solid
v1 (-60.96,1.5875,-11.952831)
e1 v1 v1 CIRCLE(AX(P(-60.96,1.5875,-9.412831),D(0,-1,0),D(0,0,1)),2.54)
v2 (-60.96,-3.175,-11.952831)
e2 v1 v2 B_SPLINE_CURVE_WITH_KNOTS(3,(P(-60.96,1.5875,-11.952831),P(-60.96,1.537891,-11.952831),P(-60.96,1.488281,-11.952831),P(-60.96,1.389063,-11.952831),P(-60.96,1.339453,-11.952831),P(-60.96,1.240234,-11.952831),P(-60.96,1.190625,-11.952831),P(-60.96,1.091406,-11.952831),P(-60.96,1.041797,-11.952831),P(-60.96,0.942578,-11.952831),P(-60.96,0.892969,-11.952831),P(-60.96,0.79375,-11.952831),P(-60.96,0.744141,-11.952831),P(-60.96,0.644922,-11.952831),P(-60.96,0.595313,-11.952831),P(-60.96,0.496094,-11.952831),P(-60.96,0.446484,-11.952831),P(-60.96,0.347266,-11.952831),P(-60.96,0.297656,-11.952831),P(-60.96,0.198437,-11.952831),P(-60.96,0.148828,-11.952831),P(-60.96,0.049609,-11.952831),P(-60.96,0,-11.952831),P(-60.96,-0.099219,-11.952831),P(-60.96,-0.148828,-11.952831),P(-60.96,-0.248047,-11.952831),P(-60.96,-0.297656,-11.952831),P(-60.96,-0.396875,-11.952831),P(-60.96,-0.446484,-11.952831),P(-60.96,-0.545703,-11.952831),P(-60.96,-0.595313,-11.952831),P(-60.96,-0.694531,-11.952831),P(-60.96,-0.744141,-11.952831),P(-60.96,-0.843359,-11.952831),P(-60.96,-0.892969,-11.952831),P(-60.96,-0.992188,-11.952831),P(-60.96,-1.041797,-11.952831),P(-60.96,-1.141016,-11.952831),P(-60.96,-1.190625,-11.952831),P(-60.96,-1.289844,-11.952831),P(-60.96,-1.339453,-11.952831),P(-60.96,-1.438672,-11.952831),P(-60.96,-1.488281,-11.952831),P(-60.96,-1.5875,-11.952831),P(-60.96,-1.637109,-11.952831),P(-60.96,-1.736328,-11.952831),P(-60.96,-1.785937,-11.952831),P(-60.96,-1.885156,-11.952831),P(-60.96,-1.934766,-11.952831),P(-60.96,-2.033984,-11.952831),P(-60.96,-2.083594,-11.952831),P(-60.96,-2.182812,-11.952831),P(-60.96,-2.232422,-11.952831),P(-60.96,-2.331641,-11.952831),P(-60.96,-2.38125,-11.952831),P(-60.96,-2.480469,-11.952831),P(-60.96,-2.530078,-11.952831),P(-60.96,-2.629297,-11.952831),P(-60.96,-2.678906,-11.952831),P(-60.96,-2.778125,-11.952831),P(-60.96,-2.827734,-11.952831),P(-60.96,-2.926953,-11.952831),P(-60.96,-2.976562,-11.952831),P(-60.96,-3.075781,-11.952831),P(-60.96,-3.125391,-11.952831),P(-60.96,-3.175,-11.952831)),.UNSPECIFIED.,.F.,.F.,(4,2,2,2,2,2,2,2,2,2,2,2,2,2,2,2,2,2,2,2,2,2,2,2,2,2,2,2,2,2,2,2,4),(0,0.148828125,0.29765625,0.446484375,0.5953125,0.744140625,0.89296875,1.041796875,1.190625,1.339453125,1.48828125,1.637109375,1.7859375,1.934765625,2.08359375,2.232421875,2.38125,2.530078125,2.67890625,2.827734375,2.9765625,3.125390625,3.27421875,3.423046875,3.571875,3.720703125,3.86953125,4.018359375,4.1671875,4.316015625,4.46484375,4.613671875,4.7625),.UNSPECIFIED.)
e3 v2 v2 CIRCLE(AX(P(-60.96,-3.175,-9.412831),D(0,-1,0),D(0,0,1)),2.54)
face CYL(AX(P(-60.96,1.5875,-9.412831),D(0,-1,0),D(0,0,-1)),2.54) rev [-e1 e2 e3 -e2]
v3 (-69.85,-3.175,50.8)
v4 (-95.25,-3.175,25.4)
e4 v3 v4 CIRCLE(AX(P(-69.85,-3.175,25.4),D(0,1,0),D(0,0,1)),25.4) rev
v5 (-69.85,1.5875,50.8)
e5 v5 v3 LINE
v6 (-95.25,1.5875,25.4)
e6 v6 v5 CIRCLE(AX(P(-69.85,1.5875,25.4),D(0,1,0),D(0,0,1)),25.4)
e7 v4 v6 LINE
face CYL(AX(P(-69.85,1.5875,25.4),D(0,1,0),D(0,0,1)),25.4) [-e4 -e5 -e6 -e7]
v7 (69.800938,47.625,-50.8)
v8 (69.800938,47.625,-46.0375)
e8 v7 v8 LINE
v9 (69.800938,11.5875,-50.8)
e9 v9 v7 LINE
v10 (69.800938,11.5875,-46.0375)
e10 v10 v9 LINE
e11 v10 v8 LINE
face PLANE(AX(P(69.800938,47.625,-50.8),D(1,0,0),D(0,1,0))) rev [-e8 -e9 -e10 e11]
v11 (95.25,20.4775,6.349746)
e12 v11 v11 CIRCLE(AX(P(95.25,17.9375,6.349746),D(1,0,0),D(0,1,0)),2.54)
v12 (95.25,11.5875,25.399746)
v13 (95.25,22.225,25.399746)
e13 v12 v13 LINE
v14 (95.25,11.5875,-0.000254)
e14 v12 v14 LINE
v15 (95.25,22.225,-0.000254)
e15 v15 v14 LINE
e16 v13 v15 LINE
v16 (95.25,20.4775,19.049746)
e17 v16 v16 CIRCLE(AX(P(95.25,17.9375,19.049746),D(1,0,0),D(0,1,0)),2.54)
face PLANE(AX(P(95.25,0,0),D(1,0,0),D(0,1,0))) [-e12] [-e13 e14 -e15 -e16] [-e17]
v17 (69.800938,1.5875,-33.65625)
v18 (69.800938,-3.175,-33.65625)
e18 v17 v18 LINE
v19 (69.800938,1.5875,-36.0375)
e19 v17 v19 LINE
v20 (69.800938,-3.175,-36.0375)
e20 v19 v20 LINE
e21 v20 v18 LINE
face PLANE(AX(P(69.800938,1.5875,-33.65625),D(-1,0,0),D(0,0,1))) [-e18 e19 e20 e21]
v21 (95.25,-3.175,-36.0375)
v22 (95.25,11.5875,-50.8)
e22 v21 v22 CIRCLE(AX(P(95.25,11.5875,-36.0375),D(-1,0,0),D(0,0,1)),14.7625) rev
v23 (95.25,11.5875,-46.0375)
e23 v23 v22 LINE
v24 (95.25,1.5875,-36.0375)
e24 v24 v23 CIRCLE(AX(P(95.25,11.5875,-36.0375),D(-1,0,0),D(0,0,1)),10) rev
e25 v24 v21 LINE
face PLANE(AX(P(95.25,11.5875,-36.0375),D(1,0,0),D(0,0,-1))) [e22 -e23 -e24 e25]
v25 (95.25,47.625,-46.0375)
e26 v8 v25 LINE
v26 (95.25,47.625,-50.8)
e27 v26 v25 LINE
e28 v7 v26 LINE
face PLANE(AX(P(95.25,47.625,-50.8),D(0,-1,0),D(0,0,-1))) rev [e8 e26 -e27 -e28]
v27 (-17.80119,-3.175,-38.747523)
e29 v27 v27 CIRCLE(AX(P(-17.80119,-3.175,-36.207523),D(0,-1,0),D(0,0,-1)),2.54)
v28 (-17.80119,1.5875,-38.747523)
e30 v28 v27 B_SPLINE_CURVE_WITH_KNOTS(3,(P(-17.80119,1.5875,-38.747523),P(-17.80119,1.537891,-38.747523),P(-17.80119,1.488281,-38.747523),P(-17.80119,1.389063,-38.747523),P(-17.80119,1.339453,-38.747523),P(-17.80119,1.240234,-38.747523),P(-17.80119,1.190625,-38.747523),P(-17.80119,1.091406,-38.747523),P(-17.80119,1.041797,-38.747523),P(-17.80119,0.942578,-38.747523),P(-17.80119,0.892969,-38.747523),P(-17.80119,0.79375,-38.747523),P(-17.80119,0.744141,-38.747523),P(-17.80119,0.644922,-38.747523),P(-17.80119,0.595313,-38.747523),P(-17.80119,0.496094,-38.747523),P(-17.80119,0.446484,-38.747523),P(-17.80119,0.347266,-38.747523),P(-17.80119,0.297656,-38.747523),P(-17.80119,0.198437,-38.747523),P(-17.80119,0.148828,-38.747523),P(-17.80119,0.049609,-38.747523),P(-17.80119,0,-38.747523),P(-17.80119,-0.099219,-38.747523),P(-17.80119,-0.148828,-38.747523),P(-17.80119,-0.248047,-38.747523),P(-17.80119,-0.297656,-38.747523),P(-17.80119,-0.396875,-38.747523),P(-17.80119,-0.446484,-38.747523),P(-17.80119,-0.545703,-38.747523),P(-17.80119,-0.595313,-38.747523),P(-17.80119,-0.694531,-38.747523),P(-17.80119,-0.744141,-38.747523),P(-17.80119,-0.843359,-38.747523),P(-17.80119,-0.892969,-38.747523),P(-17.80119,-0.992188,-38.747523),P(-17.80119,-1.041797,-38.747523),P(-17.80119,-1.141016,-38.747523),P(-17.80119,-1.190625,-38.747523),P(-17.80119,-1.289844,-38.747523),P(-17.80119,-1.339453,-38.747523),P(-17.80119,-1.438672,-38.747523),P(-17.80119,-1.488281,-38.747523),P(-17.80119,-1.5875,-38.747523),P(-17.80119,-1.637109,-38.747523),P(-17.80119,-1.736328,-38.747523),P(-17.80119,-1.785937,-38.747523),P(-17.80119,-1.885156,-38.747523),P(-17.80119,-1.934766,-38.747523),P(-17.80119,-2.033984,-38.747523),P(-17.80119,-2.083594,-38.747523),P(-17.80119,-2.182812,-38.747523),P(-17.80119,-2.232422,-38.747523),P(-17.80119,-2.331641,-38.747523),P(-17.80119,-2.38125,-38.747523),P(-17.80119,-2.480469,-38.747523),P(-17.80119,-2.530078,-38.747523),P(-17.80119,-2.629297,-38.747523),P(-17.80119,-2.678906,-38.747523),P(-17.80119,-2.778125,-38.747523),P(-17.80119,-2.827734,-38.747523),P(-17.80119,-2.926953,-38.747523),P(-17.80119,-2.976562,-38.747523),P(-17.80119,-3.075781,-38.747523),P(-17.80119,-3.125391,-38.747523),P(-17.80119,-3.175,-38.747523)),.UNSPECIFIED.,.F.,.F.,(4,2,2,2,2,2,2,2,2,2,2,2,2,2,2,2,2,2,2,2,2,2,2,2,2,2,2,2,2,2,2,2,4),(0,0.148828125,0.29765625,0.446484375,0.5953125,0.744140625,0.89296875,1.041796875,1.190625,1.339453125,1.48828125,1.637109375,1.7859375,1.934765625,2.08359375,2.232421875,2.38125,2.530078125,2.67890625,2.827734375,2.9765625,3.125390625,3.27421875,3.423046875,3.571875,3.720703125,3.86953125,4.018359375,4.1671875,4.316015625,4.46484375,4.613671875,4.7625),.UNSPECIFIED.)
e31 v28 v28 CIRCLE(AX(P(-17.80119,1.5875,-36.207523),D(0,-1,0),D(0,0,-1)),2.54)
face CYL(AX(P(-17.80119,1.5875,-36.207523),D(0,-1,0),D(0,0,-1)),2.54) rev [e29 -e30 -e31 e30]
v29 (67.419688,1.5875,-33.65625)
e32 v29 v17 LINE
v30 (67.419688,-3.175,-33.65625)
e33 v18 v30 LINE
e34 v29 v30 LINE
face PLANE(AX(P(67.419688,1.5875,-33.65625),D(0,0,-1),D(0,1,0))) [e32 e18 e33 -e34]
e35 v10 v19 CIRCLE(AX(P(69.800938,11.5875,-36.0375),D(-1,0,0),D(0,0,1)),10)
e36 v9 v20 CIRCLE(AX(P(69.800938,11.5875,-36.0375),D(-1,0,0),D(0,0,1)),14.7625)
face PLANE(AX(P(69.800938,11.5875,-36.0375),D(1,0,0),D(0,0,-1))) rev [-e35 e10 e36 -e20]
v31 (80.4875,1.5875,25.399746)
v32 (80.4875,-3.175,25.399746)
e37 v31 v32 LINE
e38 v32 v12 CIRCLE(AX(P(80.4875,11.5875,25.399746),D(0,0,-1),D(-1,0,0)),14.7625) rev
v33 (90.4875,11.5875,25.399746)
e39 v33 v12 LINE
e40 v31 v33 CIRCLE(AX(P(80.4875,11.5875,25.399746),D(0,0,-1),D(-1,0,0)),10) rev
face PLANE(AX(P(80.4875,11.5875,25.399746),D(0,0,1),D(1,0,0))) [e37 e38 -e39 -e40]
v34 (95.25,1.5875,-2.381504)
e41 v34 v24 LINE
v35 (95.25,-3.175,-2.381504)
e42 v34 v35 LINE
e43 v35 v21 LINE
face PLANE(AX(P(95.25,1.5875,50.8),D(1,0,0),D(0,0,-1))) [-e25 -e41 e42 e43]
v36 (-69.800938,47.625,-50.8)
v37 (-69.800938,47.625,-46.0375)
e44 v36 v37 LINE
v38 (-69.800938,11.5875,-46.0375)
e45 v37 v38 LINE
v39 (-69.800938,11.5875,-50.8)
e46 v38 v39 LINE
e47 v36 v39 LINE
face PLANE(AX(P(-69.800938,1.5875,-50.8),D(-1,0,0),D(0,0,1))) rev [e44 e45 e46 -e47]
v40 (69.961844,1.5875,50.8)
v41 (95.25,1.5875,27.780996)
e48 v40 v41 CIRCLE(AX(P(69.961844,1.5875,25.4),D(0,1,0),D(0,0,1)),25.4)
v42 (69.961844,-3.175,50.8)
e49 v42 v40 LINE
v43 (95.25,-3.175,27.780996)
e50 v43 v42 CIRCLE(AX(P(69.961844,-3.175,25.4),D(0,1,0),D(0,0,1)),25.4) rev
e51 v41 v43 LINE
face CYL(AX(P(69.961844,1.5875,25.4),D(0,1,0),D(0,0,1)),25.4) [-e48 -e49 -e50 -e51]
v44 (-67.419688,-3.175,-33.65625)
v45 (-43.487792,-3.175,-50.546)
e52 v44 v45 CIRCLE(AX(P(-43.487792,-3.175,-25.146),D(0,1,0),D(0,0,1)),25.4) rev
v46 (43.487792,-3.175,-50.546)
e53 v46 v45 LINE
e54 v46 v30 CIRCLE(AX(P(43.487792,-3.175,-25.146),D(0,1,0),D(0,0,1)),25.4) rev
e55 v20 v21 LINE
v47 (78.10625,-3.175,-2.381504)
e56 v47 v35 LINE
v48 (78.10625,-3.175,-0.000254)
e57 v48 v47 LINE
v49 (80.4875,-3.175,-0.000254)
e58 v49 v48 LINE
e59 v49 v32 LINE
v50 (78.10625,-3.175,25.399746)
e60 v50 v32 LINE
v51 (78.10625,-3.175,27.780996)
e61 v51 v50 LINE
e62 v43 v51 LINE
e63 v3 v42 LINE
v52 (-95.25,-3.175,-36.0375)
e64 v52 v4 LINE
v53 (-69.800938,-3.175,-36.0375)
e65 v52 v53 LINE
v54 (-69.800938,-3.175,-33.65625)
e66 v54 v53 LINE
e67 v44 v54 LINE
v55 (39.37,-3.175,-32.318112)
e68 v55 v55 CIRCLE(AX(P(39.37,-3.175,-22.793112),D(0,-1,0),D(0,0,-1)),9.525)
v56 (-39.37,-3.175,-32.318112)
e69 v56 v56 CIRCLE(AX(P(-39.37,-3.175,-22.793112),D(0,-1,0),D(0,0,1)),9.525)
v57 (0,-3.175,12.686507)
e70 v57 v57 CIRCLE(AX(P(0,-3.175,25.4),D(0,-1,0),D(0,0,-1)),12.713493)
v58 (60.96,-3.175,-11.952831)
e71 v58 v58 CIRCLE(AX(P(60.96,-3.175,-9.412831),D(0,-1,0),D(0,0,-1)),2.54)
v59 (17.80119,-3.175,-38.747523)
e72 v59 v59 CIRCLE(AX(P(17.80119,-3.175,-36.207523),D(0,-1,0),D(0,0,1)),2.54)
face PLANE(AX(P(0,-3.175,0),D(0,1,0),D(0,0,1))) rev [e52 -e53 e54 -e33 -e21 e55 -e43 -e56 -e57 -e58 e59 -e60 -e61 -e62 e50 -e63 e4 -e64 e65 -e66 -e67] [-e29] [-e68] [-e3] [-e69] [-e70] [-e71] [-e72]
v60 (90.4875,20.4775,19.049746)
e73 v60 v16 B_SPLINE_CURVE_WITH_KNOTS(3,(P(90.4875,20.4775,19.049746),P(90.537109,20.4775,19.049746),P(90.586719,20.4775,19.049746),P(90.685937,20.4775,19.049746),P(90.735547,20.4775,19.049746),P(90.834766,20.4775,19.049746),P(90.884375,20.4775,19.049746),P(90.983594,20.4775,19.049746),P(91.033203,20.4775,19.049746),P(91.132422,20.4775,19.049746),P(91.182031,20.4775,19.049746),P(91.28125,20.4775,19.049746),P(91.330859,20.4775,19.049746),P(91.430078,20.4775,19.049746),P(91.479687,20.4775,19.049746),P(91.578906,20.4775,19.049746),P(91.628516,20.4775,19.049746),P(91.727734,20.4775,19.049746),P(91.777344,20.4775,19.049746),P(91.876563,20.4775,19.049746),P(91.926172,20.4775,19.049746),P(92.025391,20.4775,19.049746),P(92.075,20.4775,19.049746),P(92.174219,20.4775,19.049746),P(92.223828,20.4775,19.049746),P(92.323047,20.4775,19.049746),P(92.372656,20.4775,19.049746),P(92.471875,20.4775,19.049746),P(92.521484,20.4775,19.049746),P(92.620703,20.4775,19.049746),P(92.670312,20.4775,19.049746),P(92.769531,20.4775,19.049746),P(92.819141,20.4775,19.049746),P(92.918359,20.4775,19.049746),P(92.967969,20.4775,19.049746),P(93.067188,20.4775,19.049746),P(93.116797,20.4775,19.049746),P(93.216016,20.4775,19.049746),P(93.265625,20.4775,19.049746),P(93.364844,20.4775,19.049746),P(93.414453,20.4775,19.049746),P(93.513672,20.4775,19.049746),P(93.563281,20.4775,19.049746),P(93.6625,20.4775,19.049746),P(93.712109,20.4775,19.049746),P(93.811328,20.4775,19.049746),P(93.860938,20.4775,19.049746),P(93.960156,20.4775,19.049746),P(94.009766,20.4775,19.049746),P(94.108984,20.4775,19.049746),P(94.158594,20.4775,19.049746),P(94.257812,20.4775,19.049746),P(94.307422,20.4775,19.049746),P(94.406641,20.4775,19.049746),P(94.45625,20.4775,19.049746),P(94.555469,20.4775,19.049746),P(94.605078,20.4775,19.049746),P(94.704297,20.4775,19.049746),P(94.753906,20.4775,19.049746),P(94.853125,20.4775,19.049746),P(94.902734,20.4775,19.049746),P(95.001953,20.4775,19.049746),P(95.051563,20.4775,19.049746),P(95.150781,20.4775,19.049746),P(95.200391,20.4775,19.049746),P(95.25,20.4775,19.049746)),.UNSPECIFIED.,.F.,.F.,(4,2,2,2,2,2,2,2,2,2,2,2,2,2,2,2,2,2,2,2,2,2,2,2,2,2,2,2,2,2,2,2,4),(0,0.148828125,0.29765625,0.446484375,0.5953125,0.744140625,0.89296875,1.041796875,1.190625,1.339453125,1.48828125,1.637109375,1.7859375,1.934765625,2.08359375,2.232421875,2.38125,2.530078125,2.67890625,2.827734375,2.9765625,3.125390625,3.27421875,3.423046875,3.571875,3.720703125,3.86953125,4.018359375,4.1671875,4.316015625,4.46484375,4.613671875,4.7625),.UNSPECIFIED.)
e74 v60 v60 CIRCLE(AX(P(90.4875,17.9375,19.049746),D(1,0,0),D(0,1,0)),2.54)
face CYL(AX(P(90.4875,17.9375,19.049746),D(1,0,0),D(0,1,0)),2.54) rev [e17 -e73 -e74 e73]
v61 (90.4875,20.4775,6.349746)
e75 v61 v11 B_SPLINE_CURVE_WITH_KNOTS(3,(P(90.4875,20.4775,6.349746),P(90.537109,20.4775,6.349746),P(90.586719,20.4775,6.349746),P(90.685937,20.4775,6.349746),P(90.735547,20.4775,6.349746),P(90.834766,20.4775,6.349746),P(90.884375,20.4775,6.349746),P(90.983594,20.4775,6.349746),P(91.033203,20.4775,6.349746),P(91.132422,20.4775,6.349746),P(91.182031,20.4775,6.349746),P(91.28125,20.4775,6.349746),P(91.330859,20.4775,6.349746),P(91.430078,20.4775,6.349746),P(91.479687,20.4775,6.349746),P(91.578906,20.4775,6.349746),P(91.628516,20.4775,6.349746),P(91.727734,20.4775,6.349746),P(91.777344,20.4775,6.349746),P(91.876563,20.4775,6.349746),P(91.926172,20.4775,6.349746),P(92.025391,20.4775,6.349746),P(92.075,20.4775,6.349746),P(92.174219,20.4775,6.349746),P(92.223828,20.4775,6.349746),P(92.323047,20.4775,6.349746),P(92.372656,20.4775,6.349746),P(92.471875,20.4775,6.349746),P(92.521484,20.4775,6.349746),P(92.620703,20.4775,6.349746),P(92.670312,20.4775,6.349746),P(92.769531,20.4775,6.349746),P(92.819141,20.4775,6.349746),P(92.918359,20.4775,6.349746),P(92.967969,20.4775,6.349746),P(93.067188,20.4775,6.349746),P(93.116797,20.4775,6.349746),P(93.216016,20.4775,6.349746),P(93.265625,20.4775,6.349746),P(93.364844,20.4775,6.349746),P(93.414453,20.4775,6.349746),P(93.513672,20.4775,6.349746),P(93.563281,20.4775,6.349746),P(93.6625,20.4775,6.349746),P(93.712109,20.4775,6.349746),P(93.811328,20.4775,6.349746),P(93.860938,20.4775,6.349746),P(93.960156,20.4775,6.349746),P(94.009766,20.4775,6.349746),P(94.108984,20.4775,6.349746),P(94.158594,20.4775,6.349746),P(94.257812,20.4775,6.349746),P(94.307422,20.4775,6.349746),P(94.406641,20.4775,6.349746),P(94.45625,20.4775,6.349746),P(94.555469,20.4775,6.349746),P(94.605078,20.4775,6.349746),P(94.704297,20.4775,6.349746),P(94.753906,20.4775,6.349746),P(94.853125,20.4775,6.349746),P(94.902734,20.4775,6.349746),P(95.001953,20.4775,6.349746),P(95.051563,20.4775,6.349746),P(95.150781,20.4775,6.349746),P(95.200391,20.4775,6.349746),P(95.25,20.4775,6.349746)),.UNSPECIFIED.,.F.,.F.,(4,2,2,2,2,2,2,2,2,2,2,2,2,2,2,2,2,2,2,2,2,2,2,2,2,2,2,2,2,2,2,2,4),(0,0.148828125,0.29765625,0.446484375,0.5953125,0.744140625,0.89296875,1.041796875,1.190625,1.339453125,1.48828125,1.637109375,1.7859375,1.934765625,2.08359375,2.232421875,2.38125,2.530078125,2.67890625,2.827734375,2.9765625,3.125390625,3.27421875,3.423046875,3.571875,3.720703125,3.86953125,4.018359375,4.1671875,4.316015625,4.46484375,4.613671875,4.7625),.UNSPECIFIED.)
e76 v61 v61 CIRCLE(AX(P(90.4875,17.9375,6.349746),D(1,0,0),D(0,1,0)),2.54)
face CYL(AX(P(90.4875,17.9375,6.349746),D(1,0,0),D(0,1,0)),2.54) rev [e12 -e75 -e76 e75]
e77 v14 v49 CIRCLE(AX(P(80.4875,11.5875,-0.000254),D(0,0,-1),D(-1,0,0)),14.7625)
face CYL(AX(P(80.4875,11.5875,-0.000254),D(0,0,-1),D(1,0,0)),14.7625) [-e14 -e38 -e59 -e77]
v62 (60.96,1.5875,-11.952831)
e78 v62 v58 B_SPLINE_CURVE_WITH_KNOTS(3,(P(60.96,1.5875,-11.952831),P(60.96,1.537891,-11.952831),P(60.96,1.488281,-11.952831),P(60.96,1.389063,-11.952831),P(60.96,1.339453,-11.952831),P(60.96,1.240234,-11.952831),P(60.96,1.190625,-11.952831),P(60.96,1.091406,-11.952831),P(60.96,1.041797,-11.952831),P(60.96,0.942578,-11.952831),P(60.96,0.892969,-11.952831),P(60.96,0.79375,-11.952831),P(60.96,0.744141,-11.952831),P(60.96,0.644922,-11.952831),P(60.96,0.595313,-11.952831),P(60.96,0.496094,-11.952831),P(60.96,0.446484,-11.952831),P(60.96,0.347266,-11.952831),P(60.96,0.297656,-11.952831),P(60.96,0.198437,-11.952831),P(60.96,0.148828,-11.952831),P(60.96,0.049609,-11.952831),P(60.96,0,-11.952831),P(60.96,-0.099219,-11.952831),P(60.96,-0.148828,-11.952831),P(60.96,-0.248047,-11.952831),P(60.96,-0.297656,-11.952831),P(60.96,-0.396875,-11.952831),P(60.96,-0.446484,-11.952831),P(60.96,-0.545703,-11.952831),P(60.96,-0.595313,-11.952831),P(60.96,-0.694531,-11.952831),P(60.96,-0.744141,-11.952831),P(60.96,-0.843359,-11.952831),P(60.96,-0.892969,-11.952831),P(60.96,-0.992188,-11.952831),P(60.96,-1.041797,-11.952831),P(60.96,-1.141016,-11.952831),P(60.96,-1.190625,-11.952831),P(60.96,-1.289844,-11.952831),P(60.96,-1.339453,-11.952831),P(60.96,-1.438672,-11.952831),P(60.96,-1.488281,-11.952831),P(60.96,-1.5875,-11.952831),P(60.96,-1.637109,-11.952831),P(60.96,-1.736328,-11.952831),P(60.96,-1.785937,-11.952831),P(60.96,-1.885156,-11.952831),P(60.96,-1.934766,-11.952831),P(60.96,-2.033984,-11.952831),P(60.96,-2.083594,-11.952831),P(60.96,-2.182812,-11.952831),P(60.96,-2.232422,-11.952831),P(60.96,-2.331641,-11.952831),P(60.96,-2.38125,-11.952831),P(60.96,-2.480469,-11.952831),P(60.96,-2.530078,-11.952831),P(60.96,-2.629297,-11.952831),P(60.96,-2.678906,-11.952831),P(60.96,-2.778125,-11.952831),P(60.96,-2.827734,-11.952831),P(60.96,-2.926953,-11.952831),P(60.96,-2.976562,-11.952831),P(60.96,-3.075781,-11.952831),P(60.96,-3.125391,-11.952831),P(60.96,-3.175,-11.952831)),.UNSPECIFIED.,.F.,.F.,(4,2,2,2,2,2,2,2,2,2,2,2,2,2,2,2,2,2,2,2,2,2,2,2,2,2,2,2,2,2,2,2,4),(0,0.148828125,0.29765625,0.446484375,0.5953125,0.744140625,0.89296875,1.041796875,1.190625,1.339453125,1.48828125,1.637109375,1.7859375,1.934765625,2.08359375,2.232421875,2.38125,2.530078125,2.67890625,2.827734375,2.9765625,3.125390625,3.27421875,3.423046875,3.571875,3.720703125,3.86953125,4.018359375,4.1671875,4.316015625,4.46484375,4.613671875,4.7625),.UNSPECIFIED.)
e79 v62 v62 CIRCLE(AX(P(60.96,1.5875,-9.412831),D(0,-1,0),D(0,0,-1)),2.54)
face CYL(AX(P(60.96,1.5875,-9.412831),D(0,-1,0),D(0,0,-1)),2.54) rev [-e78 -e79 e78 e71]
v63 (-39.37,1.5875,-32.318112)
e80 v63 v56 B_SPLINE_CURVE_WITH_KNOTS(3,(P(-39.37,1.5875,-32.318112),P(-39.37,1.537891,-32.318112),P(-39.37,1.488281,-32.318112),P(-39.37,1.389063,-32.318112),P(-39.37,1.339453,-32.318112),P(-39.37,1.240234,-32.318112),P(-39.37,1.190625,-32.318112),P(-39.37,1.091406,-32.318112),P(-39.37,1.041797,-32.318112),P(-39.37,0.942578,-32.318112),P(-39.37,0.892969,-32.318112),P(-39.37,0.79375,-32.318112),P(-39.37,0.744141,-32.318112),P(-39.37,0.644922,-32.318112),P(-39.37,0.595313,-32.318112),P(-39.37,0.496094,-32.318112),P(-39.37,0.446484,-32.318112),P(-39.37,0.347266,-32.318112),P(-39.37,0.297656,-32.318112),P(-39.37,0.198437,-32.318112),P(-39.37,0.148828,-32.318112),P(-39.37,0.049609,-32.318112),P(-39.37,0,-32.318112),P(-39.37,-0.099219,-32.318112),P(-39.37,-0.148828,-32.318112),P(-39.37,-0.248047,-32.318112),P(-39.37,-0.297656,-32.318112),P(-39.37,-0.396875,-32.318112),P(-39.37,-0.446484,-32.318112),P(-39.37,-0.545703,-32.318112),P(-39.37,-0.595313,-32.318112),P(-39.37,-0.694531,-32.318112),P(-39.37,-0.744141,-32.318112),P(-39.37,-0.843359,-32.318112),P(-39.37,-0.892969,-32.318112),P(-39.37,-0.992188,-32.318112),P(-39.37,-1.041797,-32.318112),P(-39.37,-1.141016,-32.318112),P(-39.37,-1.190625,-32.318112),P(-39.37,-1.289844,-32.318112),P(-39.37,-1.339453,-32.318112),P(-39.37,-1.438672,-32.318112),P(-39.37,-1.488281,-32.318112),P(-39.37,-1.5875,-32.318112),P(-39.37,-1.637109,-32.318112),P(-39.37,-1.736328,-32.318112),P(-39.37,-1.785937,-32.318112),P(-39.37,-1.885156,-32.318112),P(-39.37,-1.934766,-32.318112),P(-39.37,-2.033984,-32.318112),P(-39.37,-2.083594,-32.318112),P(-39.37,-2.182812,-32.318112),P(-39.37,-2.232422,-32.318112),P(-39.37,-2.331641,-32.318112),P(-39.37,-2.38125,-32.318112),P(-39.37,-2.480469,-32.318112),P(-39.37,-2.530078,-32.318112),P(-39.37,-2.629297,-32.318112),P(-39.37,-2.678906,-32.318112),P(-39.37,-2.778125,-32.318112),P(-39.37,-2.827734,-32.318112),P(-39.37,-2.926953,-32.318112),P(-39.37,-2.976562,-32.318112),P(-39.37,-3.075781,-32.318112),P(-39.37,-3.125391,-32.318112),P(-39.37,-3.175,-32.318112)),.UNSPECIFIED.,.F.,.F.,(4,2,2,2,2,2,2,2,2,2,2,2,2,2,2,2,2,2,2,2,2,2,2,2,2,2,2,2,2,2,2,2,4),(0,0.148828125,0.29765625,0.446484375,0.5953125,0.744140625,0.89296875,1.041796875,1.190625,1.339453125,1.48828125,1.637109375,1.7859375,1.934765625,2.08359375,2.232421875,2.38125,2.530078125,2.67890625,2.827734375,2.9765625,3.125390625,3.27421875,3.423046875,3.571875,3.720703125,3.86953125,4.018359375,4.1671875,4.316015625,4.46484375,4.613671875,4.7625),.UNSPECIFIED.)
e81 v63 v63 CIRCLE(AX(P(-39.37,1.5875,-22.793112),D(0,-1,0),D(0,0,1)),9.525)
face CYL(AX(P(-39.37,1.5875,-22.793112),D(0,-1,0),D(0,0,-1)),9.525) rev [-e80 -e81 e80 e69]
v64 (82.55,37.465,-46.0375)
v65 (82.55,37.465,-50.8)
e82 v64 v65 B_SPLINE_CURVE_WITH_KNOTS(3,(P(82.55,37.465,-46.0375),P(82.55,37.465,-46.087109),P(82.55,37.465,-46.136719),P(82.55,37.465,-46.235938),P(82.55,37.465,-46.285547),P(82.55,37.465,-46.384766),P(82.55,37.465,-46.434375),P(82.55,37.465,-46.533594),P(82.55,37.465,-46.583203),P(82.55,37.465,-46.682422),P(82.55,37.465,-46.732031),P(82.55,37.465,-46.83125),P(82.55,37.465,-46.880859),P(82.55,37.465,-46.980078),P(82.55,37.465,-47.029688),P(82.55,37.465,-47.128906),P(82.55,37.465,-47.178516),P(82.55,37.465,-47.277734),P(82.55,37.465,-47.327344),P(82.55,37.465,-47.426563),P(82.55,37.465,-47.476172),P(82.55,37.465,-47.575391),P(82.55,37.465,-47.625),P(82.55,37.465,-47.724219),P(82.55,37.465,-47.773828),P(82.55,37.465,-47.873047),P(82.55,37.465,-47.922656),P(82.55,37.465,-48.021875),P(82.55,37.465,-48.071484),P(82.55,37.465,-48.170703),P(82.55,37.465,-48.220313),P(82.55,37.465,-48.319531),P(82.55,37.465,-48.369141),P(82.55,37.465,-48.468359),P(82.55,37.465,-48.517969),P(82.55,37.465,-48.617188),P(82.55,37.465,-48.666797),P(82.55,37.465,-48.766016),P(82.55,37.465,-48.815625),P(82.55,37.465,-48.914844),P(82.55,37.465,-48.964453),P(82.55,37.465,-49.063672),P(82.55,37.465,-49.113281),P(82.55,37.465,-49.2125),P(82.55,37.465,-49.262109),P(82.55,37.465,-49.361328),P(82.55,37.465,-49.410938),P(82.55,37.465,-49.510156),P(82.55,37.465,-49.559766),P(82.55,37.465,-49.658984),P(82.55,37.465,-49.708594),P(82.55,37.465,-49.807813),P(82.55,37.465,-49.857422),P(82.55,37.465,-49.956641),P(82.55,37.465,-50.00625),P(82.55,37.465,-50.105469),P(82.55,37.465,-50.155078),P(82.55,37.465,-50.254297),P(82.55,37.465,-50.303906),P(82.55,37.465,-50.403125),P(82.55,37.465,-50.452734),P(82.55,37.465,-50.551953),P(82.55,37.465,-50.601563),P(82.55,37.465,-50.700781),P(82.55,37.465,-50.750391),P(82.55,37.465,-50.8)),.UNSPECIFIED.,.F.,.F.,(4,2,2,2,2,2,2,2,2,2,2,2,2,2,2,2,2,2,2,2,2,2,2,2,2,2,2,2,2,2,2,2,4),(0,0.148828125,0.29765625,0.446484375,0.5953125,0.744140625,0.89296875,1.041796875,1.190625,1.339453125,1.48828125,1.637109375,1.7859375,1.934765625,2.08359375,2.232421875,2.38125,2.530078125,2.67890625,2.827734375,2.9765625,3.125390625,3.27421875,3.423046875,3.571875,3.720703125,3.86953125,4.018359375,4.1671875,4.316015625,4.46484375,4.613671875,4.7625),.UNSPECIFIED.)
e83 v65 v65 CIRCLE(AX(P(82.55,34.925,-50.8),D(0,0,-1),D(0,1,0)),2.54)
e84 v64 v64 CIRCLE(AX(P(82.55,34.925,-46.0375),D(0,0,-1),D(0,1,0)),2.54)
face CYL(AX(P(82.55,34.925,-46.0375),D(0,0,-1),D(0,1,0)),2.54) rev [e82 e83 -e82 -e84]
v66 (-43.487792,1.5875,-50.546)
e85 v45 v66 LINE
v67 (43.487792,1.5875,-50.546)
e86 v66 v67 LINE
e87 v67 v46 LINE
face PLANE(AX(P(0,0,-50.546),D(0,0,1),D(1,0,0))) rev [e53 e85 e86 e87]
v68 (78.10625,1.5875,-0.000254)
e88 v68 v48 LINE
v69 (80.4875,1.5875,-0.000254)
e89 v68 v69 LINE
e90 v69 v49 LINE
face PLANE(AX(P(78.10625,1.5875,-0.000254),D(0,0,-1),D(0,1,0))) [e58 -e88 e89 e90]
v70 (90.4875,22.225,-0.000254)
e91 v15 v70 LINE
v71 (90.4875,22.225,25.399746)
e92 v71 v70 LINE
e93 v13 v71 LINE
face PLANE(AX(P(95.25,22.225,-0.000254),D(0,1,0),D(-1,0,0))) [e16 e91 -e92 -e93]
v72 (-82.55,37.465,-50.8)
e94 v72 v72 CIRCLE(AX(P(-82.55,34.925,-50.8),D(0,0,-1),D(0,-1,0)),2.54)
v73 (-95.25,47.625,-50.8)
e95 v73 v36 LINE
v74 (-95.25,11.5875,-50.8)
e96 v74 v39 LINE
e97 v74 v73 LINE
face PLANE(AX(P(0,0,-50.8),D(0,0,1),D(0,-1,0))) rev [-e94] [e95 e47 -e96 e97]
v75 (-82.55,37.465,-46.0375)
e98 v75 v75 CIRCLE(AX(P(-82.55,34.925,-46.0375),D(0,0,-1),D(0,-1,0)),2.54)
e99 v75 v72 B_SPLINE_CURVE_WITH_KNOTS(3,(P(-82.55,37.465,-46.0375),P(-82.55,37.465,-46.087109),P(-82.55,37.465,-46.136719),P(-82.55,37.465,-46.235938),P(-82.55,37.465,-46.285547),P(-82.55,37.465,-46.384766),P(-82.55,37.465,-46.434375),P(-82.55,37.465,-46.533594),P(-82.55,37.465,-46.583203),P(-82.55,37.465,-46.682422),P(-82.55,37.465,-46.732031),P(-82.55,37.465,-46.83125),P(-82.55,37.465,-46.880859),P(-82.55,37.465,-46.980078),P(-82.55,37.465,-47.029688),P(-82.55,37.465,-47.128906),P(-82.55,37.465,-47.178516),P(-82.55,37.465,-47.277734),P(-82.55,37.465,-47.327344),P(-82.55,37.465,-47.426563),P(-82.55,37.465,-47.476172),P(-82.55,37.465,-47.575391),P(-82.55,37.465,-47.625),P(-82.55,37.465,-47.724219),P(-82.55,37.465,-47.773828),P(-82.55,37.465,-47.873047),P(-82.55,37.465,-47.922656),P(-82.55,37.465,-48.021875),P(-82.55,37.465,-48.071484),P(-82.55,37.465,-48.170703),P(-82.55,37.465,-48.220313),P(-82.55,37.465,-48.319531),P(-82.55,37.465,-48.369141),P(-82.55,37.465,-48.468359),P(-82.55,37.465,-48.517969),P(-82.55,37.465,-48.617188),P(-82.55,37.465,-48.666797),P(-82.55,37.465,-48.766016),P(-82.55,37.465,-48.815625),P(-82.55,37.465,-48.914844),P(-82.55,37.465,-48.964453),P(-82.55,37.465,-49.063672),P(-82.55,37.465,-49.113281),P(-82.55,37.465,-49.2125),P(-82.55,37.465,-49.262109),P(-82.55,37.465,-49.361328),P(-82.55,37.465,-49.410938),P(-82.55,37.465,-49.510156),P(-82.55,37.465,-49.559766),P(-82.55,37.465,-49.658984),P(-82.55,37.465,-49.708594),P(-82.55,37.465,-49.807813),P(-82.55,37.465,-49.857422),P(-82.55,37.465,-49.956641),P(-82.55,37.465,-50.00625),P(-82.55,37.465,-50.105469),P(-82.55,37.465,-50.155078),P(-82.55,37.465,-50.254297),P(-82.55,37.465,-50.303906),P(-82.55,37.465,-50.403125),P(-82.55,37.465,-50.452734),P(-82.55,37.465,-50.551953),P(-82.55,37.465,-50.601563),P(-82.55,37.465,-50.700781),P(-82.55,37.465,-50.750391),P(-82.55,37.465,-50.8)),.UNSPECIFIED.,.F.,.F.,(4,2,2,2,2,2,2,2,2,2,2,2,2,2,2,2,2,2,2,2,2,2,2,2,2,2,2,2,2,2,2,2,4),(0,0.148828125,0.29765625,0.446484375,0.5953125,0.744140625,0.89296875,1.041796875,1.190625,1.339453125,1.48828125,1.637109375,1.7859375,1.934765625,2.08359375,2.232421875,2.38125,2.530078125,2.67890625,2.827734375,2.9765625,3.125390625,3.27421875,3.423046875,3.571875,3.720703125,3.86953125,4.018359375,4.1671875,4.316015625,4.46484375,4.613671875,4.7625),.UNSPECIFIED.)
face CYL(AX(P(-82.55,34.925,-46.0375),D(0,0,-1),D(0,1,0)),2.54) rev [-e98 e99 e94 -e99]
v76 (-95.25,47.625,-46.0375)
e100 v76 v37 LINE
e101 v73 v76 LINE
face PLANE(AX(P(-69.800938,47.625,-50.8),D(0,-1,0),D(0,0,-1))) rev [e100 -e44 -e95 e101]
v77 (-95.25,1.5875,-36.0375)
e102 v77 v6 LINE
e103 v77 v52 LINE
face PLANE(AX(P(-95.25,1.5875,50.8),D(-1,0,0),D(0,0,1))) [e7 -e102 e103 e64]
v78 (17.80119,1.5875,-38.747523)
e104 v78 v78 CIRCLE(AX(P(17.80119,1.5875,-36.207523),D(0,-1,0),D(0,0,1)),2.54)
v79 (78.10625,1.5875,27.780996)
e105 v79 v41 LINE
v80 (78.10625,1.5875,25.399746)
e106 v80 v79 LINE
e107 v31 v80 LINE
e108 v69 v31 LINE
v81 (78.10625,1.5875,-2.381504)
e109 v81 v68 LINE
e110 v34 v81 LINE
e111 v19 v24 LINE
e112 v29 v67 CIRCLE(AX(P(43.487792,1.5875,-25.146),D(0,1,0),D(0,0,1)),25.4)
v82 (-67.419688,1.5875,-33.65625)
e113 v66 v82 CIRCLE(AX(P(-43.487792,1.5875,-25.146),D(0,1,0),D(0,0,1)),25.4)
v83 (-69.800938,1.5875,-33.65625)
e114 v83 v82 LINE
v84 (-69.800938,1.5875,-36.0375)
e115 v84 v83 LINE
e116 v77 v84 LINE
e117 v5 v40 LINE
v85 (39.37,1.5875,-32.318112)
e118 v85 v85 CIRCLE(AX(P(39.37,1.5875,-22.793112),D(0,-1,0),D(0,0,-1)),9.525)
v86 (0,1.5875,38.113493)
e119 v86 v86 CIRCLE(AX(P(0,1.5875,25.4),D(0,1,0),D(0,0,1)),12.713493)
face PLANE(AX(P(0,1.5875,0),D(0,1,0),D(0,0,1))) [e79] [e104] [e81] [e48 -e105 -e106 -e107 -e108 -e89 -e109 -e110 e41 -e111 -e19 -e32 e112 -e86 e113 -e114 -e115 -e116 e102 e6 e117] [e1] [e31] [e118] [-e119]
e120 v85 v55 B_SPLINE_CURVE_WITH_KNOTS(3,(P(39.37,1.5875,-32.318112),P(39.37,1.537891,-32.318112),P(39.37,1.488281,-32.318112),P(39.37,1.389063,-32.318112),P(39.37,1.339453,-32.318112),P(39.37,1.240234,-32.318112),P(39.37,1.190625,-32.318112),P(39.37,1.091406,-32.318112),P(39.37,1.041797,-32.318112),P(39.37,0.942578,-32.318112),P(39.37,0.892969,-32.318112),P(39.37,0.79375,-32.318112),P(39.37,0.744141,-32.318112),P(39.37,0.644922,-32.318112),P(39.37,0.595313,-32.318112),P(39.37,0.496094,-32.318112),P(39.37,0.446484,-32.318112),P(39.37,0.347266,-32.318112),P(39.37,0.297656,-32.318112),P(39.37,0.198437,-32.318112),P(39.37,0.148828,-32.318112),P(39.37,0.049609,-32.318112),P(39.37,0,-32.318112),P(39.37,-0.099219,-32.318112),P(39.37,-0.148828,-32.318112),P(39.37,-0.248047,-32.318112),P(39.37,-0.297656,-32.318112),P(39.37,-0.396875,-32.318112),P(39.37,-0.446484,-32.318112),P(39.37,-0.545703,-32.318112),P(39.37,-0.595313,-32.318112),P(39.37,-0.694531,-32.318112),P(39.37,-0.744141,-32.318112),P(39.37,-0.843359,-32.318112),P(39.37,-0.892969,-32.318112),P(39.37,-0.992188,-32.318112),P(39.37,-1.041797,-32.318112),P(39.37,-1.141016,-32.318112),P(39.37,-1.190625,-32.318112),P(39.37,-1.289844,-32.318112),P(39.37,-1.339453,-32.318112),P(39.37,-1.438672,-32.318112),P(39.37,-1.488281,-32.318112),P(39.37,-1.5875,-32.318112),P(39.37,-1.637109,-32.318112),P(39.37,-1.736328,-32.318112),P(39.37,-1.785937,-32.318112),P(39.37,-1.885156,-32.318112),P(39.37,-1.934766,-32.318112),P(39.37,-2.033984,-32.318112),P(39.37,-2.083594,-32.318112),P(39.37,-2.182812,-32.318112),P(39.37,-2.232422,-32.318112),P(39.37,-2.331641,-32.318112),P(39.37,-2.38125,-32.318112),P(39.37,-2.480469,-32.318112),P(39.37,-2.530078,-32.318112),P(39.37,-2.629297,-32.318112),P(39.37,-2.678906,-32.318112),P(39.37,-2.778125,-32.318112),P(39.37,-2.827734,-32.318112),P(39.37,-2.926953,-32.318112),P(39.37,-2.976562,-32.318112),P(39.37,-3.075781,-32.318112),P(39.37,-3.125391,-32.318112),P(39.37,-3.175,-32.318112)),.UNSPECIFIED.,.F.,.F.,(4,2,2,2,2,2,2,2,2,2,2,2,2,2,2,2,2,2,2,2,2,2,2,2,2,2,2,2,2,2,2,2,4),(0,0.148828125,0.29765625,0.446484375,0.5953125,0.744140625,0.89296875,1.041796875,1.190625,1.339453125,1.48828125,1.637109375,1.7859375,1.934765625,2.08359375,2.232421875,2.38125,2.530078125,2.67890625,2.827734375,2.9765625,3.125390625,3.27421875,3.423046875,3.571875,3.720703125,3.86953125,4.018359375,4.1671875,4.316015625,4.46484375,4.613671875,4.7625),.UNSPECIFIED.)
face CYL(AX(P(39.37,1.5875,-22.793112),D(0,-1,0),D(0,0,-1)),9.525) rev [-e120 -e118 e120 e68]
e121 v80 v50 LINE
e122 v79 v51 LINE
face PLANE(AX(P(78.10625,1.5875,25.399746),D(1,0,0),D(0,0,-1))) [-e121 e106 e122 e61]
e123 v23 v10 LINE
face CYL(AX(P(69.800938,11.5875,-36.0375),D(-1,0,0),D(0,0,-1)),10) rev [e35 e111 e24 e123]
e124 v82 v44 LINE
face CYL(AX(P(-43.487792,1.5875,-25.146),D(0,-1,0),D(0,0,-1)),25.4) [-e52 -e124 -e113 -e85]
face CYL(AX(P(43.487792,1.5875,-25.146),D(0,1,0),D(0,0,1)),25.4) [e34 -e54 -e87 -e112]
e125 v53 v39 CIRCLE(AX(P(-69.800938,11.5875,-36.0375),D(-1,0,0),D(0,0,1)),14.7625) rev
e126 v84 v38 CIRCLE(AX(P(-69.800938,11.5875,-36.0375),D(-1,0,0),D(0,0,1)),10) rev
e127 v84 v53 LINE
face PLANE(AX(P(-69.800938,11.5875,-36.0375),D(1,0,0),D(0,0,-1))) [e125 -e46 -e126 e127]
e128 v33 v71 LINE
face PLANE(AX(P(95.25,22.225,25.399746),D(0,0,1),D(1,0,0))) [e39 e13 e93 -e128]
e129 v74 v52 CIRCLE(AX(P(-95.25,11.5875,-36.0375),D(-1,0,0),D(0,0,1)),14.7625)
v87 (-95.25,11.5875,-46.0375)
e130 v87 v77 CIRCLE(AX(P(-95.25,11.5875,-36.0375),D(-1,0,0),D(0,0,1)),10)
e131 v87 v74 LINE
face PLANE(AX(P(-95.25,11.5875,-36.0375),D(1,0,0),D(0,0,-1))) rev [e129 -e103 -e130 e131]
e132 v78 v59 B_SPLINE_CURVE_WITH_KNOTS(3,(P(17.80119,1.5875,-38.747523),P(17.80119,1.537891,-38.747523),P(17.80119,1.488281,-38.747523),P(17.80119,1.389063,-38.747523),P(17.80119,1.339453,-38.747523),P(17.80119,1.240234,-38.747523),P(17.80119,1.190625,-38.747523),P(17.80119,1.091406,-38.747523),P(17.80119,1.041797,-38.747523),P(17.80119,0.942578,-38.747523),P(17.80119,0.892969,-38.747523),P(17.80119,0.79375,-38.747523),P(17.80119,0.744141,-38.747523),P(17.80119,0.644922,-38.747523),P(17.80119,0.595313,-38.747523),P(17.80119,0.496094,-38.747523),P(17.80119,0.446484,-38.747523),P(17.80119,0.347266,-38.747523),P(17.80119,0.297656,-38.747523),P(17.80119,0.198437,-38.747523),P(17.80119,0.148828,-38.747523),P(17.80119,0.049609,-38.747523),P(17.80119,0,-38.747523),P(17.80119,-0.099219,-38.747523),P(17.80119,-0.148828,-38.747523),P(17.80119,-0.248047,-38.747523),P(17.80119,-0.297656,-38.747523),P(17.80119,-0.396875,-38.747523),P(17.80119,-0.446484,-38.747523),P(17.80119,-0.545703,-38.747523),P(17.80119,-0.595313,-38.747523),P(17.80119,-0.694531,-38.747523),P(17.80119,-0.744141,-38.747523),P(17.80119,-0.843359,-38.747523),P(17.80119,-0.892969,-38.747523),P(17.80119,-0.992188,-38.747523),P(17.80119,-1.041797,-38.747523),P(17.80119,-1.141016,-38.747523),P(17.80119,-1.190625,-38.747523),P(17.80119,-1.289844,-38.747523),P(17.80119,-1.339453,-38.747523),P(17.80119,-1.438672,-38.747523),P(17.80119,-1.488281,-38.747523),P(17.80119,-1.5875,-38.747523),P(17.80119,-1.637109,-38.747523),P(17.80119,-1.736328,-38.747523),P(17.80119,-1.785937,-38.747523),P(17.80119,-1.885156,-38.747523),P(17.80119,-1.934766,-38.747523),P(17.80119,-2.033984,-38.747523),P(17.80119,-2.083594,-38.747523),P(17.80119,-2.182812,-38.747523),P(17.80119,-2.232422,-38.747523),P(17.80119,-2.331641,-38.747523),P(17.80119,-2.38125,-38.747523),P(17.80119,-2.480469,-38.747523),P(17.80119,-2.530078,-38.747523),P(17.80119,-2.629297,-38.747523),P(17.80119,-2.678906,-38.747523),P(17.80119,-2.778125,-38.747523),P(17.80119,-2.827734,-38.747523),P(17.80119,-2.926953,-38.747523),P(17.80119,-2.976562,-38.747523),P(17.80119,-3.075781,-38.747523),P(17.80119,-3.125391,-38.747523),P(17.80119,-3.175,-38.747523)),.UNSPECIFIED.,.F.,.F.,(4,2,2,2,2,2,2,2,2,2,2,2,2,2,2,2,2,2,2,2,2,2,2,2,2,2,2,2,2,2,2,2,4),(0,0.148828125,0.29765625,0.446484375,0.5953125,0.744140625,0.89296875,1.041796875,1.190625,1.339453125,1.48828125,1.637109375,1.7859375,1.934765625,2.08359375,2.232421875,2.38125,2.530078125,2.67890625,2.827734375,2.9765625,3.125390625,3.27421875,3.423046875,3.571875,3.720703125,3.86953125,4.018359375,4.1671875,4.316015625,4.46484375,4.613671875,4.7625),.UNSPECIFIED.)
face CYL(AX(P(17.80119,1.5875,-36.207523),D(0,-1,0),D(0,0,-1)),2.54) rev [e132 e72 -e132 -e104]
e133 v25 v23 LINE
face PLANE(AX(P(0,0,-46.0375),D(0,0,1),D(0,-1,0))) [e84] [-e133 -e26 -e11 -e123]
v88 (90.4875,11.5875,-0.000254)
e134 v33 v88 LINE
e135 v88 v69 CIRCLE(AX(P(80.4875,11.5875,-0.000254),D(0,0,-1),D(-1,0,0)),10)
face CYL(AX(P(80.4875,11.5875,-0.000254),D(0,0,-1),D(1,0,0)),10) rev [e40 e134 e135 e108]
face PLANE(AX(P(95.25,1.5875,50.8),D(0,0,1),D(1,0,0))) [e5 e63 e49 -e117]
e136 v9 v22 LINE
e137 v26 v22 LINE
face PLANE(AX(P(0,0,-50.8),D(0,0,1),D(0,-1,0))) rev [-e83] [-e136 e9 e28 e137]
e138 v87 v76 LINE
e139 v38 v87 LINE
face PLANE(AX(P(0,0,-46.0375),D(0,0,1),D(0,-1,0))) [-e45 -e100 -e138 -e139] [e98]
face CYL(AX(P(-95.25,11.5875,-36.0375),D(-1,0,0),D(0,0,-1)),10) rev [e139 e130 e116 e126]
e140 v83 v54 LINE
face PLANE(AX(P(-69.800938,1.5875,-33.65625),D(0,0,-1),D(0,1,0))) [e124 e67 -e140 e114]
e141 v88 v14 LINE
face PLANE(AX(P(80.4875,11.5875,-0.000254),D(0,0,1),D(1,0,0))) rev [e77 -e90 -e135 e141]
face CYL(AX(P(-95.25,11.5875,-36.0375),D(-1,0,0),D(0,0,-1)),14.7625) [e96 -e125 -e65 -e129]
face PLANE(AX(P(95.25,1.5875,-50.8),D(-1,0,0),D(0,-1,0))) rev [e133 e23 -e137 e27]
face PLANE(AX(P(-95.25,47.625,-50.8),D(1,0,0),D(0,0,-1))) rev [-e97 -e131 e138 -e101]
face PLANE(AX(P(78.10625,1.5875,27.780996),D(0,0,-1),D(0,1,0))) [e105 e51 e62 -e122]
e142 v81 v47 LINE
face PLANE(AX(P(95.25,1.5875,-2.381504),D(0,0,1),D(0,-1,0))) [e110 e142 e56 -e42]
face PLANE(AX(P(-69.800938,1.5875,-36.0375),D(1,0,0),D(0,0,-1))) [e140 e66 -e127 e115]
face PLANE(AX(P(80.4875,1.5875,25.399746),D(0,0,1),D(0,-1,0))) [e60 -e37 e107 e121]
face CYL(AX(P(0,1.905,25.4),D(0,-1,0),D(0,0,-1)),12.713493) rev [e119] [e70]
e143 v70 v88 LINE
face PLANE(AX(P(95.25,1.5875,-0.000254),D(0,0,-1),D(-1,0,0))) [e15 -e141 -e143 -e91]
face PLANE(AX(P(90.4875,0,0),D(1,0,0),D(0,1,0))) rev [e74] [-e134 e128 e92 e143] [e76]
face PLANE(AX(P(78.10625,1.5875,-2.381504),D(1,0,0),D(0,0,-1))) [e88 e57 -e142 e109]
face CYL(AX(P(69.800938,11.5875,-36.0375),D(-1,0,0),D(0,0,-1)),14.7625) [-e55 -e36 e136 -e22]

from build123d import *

# Parameters (mm, degrees)
SKETCH1_W                     = 190.5
SKETCH1_H                     = 101.6
BOSS_EXTRUDE1_DEPTH           = 1.5875
CONVERT_SOLID1_START          = -95.25
CONVERT_SOLID1_OUTLINE_W      = 3.175
CONVERT_SOLID1_OUTLINE_H      = 101.6
CONVERT_SOLID1_DEPTH          = 190.5
SKETCH35_W                    = 139.601875342
SKETCH35_H                    = 6.35
CUT_EXTRUDE7_DEPTH            = 0.254
EDGE_FLANGE1_STRIP_W          = 39.05
EDGE_FLANGE1_STRIP_H          = 4.7625
EDGE_FLANGE1_STRIP_CUT_DEPTH  = 25.449062329
EDGE_FLANGE1_RELIEF_W         = 41.43125
EDGE_FLANGE1_RELIEF_H         = 2.38125
EDGE_FLANGE1_RELIEF_CUT_DEPTH = 4.7625
EDGE_FLANGE1_DEPTH            = 25.449062329
EDGE_FLANGE2_STRIP_W          = 39.05
EDGE_FLANGE2_STRIP_H          = 4.7625
EDGE_FLANGE2_STRIP_CUT_DEPTH  = 25.449062329
EDGE_FLANGE2_RELIEF_W         = 41.43125
EDGE_FLANGE2_RELIEF_H         = 2.38125
EDGE_FLANGE2_RELIEF_CUT_DEPTH = 4.7625
EDGE_FLANGE2_DEPTH            = 25.449062329
SKETCH50_R                    = 12.713493351
CUT_EXTRUDE9_DEPTH            = 5.08
FILLET1_R                     = 25.4
CUT_EXTRUDE11_START           = -4.7625
CUT_EXTRUDE11_OUTLINE_W       = 6.35
CUT_EXTRUDE11_OUTLINE_H       = 0.00254
CUT_EXTRUDE11_OUTLINE_H_2     = 0.000254
CUT_EXTRUDE11_DEPTH           = 4.7625
EDGE_FLANGE3_STRIP_W          = 39.05
EDGE_FLANGE3_STRIP_H          = 4.7625
EDGE_FLANGE3_STRIP_CUT_DEPTH  = 25.4
EDGE_FLANGE3_RELIEF_W         = 41.43125
EDGE_FLANGE3_RELIEF_H         = 2.38125
EDGE_FLANGE3_RELIEF_CUT_DEPTH = 4.7625
EDGE_FLANGE3_DEPTH            = 25.4
SKETCH55_R                    = 2.54
CUT_EXTRUDE12_DEPTH           = 4.7625
FILLET2_R                     = 25.4
SKETCH56_R                    = 2.54
CUT_EXTRUDE13_DEPTH           = 4.7625
SKETCH57_R                    = 9.525
SKETCH57_R_2                  = 2.54
CUT_EXTRUDE14_DEPTH           = 4.7625


# Read off the part's stored shape, not the designer's step: Convert-Solid1, Cut-Extrude11
# Sheet-metal steps are written as plain solids
with BuildPart() as part:
    # Sketch1 → Boss-Extrude1 (new body)
    with BuildSketch(Plane(origin=(0, 0, 0), x_dir=(1, 0, 0), z_dir=(0, 1, 0))):
        Rectangle(SKETCH1_W, SKETCH1_H)
    extrude(amount=BOSS_EXTRUDE1_DEPTH)

    # Convert-Solid1 outline → Convert-Solid1 (add)
    with BuildSketch(Plane.YZ.offset(CONVERT_SOLID1_START)):
        with Locations((-1.5875, 0)):
            Rectangle(CONVERT_SOLID1_OUTLINE_W, CONVERT_SOLID1_OUTLINE_H)
    extrude(amount=CONVERT_SOLID1_DEPTH)

    # Sketch35 → Cut-Extrude7 (cut)
    with BuildSketch(Plane(origin=(0, 0, -50.8), x_dir=(-1, 0, 0), z_dir=(0, 0, -1))):
        Rectangle(SKETCH35_W, SKETCH35_H)
    extrude(amount=-CUT_EXTRUDE7_DEPTH, mode=Mode.SUBTRACT)

    # Edge-Flange1 strip (across the edge) → Edge-Flange1 strip cut (cut)
    with BuildSketch(Plane(origin=(95.25, 1.5875, -50.8), x_dir=(0, 0, 1), z_dir=(-1, 0, 0))):
        with Locations((-4.7625, -2.38125)):
            Rectangle(EDGE_FLANGE1_STRIP_W, EDGE_FLANGE1_STRIP_H)
    extrude(amount=EDGE_FLANGE1_STRIP_CUT_DEPTH, mode=Mode.SUBTRACT)

    # Edge-Flange1 relief (on the sheet) → Edge-Flange1 relief cut (cut)
    with BuildSketch(Plane(origin=(95.25, 1.5875, -36.0375), x_dir=(0, 0, 1), z_dir=(0, 1, 0))):
        with Locations((-18.334375, -26.639687329)):
            Rectangle(EDGE_FLANGE1_RELIEF_W, EDGE_FLANGE1_RELIEF_H)
    extrude(amount=-EDGE_FLANGE1_RELIEF_CUT_DEPTH, mode=Mode.SUBTRACT)

    # Edge-Flange1 section (across the edge) → Edge-Flange1 (add)
    with BuildSketch(Plane(origin=(95.25, 1.5875, -50.8), x_dir=(0, 0, 1), z_dir=(-1, 0, 0))):
        with BuildLine():
            Line((0, 10), (0, 46.0375))
            Line((0, 46.0375), (4.7625, 46.0375))
            Line((4.7625, 46.0375), (4.7625, 10))
            ThreePointArc((4.7625, 10), (7.691432188, 2.928932188), (14.7625, 0))
            Line((14.7625, 0), (14.7625, -4.7625))
            ThreePointArc((14.7625, -4.7625), (4.323836143, -0.438663857), (0, 10))
        make_face()
    extrude(amount=EDGE_FLANGE1_DEPTH)

    # Edge-Flange2 strip (across the edge) → Edge-Flange2 strip cut (cut)
    with BuildSketch(Plane(origin=(-69.800937671, 1.5875, -50.8), x_dir=(0, 0, 1), z_dir=(-1, 0, 0))):
        with Locations((-4.7625, -2.38125)):
            Rectangle(EDGE_FLANGE2_STRIP_W, EDGE_FLANGE2_STRIP_H)
    extrude(amount=EDGE_FLANGE2_STRIP_CUT_DEPTH, mode=Mode.SUBTRACT)

    # Edge-Flange2 relief (on the sheet) → Edge-Flange2 relief cut (cut)
    with BuildSketch(Plane(origin=(-69.800937671, 1.5875, -36.0375), x_dir=(0, 0, 1), z_dir=(0, 1, 0))):
        with Locations((-18.334375, 1.190625)):
            Rectangle(EDGE_FLANGE2_RELIEF_W, EDGE_FLANGE2_RELIEF_H)
    extrude(amount=-EDGE_FLANGE2_RELIEF_CUT_DEPTH, mode=Mode.SUBTRACT)

    # Edge-Flange2 section (across the edge) → Edge-Flange2 (add)
    with BuildSketch(Plane(origin=(-69.800937671, 1.5875, -50.8), x_dir=(0, 0, 1), z_dir=(-1, 0, 0))):
        with BuildLine():
            Line((0, 10), (0, 46.0375))
            Line((0, 46.0375), (4.7625, 46.0375))
            Line((4.7625, 46.0375), (4.7625, 10))
            ThreePointArc((4.7625, 10), (7.691432188, 2.928932188), (14.7625, 0))
            Line((14.7625, 0), (14.7625, -4.7625))
            ThreePointArc((14.7625, -4.7625), (4.323836143, -0.438663857), (0, 10))
        make_face()
    extrude(amount=EDGE_FLANGE2_DEPTH)

    # Sketch50 → Cut-Extrude9 (cut)
    with BuildSketch(Plane(origin=(0, -3.175, 0), x_dir=(-1, 0, 0), z_dir=(0, -1, 0))):
        with Locations(Location((0, -25.4, 0), (0, 0, 90))):
            Circle(SKETCH50_R)
    extrude(amount=-CUT_EXTRUDE9_DEPTH, mode=Mode.SUBTRACT)

    # Fillet1
    # the kernel refuses this fillet: 25.4 mm, written as the material it takes off along each edge
    with BuildSketch(Plane(origin=(-67.419687671, 61.417239936, -50.546), x_dir=(1, 0, 0), z_dir=(0, -1, 0))) as fillet1_piece_1:
        with BuildLine():
            CenterArc((23.931895975, 25.4), FILLET1_R, 199.575530564, 70.424469436)
            Line((0, 16.88975), (-0.478637919, 16.719545))
            ThreePointArc((-0.478637919, 16.719545), (-0.508, 8.444875), (-0.508, 0))
            Line((-0.508, 0), (0, -0.508))
            Line((0, -0.508), (23.931895975, -0.508))
            Line((23.931895975, -0.508), (23.931895975, 0))
        make_face()
    extrude(amount=124.421979873, mode=Mode.SUBTRACT)
    with BuildSketch(Plane(origin=(67.419687671, 61.417239936, -50.546), x_dir=(0, 0, 1), z_dir=(0, -1, 0))) as fillet1_piece_2:
        with BuildLine():
            CenterArc((25.4, 23.931895975), FILLET1_R, 180, 70.424469436)
            Line((0, 23.931895975), (-0.508, 23.931895975))
            Line((-0.508, 23.931895975), (-0.508, 0))
            Line((-0.508, 0), (0, -0.508))
            ThreePointArc((0, -0.508), (8.444875, -0.508), (16.719545, -0.478637919))
            Line((16.719545, -0.478637919), (16.88975, 0))
        make_face()
    extrude(amount=124.421979873, mode=Mode.SUBTRACT)

    # Cut-Extrude11 outline → Cut-Extrude11 (cut)
    with BuildSketch(Plane.XZ.offset(3.175).offset(CUT_EXTRUDE11_START)):
        with Locations((92.075, -0.001524)):
            Rectangle(CUT_EXTRUDE11_OUTLINE_W, CUT_EXTRUDE11_OUTLINE_H)
        with Locations((92.075, 25.399873)):
            Rectangle(CUT_EXTRUDE11_OUTLINE_W, CUT_EXTRUDE11_OUTLINE_H_2)
    extrude(amount=CUT_EXTRUDE11_DEPTH, mode=Mode.SUBTRACT)

    # Edge-Flange3 strip (across the edge) → Edge-Flange3 strip cut (cut)
    with BuildSketch(Plane(origin=(95.25, 1.5875, 25.399746), x_dir=(-1, 0, 0), z_dir=(0, 0, -1))):
        with Locations((-4.7625, -2.38125)):
            Rectangle(EDGE_FLANGE3_STRIP_W, EDGE_FLANGE3_STRIP_H)
    extrude(amount=EDGE_FLANGE3_STRIP_CUT_DEPTH, mode=Mode.SUBTRACT)

    # Edge-Flange3 relief (on the sheet) → Edge-Flange3 relief cut (cut)
    with BuildSketch(Plane(origin=(80.4875, 1.5875, 25.399746), x_dir=(-1, 0, 0), z_dir=(0, 1, 0))):
        with Locations((-18.334375, 1.190625)):
            Rectangle(EDGE_FLANGE3_RELIEF_W, EDGE_FLANGE3_RELIEF_H)
        with Locations((-18.334375, -26.590625)):
            Rectangle(EDGE_FLANGE3_RELIEF_W, EDGE_FLANGE3_RELIEF_H)
    extrude(amount=-EDGE_FLANGE3_RELIEF_CUT_DEPTH, mode=Mode.SUBTRACT)

    # Edge-Flange3 section (across the edge) → Edge-Flange3 (add)
    with BuildSketch(Plane(origin=(95.25, 1.5875, 25.399746), x_dir=(-1, 0, 0), z_dir=(0, 0, -1))):
        with BuildLine():
            Line((0, 10), (0, 20.6375))
            Line((0, 20.6375), (4.7625, 20.6375))
            Line((4.7625, 20.6375), (4.7625, 10))
            ThreePointArc((4.7625, 10), (7.691432188, 2.928932188), (14.7625, 0))
            Line((14.7625, 0), (14.7625, -4.7625))
            ThreePointArc((14.7625, -4.7625), (4.323836143, -0.438663857), (0, 10))
        make_face()
    extrude(amount=EDGE_FLANGE3_DEPTH)

    # Sketch55 → Cut-Extrude12 (cut)
    with BuildSketch(Plane(origin=(95.25, 0, 0), x_dir=(0, 0, -1), z_dir=(1, 0, 0))):
        with Locations(Location((-6.349746, 17.9375, 0), (0, 0, 90))):
            Circle(SKETCH55_R)
        with Locations(Location((-19.049746, 17.9375, 0), (0, 0, 90))):
            Circle(SKETCH55_R)
    extrude(amount=-CUT_EXTRUDE12_DEPTH, mode=Mode.SUBTRACT)

    # Fillet2
    # the kernel refuses this fillet: 25.4 mm, written as the material it takes off along each edge
    with BuildSketch(Plane(origin=(-95.25, 65.0875, 50.8), x_dir=(1, 0, 0), z_dir=(0, -1, 0))) as fillet2_piece_1:
        with BuildLine():
            CenterArc((FILLET2_R, -FILLET2_R), FILLET2_R, 90, 90)
            Line((0, -FILLET2_R), (-FILLET2_R * 0.02, -FILLET2_R))
            Line((-FILLET2_R * 0.02, -FILLET2_R), (-FILLET2_R * 0.02, FILLET2_R * 0.02))
            Line((-FILLET2_R * 0.02, FILLET2_R * 0.02), (FILLET2_R, FILLET2_R * 0.02))
            Line((FILLET2_R, FILLET2_R * 0.02), (FILLET2_R, 0))
        make_face()
    extrude(amount=131.7625, mode=Mode.SUBTRACT)
    with BuildSketch(Plane(origin=(95.25, -66.395391195, 50.8), x_dir=(-1, 0, 0), z_dir=(0, 1, 0))) as fillet2_piece_2:
        with BuildLine():
            CenterArc((25.288156478, -25.4), FILLET2_R, 90, 84.621196501)
            Line((0, -23.019004), (-0.50576313, -22.97138408))
            ThreePointArc((-0.50576313, -22.97138408), (-0.508, -11.509502), (-0.508, 0))
            Line((-0.508, 0), (0, 0.508))
            Line((0, 0.508), (25.288156478, 0.508))
            Line((25.288156478, 0.508), (25.288156478, 0))
        make_face()
    extrude(amount=131.203282389, mode=Mode.SUBTRACT)

    # Sketch56 → Cut-Extrude13 (cut)
    with BuildSketch(Plane(origin=(0, 0, -50.8), x_dir=(-1, 0, 0), z_dir=(0, 0, -1))):
        with Locations(Location((-82.55, 34.925, 0), (0, 0, 90))):
            Circle(SKETCH56_R)
        with Locations(Location((82.55, 34.925, 0), (0, 0, 90))):
            Circle(SKETCH56_R)
    extrude(amount=-CUT_EXTRUDE13_DEPTH, mode=Mode.SUBTRACT)

    # Sketch57 → Cut-Extrude14 (cut)
    with BuildSketch(Plane.XZ.offset(3.175)):
        with Locations(Location((39.37, -22.793111541, 0), (0, 0, 270))):
            Circle(SKETCH57_R)
        with Locations(Location((60.96, -9.412831275, 0), (0, 0, 270))):
            Circle(SKETCH57_R_2)
        with Locations(Location((17.801190198, -36.207523333, 0), (0, 0, 270))):
            Circle(SKETCH57_R_2)
        with Locations(Location((-17.801190198, -36.207523333, 0), (0, 0, 270))):
            Circle(SKETCH57_R_2)
        with Locations(Location((-39.37, -22.793111541, 0), (0, 0, 270))):
            Circle(SKETCH57_R)
        with Locations(Location((-60.96, -9.412831275, 0), (0, 0, 270))):
            Circle(SKETCH57_R_2)
    extrude(amount=-CUT_EXTRUDE14_DEPTH, mode=Mode.SUBTRACT)


solid = part.part
